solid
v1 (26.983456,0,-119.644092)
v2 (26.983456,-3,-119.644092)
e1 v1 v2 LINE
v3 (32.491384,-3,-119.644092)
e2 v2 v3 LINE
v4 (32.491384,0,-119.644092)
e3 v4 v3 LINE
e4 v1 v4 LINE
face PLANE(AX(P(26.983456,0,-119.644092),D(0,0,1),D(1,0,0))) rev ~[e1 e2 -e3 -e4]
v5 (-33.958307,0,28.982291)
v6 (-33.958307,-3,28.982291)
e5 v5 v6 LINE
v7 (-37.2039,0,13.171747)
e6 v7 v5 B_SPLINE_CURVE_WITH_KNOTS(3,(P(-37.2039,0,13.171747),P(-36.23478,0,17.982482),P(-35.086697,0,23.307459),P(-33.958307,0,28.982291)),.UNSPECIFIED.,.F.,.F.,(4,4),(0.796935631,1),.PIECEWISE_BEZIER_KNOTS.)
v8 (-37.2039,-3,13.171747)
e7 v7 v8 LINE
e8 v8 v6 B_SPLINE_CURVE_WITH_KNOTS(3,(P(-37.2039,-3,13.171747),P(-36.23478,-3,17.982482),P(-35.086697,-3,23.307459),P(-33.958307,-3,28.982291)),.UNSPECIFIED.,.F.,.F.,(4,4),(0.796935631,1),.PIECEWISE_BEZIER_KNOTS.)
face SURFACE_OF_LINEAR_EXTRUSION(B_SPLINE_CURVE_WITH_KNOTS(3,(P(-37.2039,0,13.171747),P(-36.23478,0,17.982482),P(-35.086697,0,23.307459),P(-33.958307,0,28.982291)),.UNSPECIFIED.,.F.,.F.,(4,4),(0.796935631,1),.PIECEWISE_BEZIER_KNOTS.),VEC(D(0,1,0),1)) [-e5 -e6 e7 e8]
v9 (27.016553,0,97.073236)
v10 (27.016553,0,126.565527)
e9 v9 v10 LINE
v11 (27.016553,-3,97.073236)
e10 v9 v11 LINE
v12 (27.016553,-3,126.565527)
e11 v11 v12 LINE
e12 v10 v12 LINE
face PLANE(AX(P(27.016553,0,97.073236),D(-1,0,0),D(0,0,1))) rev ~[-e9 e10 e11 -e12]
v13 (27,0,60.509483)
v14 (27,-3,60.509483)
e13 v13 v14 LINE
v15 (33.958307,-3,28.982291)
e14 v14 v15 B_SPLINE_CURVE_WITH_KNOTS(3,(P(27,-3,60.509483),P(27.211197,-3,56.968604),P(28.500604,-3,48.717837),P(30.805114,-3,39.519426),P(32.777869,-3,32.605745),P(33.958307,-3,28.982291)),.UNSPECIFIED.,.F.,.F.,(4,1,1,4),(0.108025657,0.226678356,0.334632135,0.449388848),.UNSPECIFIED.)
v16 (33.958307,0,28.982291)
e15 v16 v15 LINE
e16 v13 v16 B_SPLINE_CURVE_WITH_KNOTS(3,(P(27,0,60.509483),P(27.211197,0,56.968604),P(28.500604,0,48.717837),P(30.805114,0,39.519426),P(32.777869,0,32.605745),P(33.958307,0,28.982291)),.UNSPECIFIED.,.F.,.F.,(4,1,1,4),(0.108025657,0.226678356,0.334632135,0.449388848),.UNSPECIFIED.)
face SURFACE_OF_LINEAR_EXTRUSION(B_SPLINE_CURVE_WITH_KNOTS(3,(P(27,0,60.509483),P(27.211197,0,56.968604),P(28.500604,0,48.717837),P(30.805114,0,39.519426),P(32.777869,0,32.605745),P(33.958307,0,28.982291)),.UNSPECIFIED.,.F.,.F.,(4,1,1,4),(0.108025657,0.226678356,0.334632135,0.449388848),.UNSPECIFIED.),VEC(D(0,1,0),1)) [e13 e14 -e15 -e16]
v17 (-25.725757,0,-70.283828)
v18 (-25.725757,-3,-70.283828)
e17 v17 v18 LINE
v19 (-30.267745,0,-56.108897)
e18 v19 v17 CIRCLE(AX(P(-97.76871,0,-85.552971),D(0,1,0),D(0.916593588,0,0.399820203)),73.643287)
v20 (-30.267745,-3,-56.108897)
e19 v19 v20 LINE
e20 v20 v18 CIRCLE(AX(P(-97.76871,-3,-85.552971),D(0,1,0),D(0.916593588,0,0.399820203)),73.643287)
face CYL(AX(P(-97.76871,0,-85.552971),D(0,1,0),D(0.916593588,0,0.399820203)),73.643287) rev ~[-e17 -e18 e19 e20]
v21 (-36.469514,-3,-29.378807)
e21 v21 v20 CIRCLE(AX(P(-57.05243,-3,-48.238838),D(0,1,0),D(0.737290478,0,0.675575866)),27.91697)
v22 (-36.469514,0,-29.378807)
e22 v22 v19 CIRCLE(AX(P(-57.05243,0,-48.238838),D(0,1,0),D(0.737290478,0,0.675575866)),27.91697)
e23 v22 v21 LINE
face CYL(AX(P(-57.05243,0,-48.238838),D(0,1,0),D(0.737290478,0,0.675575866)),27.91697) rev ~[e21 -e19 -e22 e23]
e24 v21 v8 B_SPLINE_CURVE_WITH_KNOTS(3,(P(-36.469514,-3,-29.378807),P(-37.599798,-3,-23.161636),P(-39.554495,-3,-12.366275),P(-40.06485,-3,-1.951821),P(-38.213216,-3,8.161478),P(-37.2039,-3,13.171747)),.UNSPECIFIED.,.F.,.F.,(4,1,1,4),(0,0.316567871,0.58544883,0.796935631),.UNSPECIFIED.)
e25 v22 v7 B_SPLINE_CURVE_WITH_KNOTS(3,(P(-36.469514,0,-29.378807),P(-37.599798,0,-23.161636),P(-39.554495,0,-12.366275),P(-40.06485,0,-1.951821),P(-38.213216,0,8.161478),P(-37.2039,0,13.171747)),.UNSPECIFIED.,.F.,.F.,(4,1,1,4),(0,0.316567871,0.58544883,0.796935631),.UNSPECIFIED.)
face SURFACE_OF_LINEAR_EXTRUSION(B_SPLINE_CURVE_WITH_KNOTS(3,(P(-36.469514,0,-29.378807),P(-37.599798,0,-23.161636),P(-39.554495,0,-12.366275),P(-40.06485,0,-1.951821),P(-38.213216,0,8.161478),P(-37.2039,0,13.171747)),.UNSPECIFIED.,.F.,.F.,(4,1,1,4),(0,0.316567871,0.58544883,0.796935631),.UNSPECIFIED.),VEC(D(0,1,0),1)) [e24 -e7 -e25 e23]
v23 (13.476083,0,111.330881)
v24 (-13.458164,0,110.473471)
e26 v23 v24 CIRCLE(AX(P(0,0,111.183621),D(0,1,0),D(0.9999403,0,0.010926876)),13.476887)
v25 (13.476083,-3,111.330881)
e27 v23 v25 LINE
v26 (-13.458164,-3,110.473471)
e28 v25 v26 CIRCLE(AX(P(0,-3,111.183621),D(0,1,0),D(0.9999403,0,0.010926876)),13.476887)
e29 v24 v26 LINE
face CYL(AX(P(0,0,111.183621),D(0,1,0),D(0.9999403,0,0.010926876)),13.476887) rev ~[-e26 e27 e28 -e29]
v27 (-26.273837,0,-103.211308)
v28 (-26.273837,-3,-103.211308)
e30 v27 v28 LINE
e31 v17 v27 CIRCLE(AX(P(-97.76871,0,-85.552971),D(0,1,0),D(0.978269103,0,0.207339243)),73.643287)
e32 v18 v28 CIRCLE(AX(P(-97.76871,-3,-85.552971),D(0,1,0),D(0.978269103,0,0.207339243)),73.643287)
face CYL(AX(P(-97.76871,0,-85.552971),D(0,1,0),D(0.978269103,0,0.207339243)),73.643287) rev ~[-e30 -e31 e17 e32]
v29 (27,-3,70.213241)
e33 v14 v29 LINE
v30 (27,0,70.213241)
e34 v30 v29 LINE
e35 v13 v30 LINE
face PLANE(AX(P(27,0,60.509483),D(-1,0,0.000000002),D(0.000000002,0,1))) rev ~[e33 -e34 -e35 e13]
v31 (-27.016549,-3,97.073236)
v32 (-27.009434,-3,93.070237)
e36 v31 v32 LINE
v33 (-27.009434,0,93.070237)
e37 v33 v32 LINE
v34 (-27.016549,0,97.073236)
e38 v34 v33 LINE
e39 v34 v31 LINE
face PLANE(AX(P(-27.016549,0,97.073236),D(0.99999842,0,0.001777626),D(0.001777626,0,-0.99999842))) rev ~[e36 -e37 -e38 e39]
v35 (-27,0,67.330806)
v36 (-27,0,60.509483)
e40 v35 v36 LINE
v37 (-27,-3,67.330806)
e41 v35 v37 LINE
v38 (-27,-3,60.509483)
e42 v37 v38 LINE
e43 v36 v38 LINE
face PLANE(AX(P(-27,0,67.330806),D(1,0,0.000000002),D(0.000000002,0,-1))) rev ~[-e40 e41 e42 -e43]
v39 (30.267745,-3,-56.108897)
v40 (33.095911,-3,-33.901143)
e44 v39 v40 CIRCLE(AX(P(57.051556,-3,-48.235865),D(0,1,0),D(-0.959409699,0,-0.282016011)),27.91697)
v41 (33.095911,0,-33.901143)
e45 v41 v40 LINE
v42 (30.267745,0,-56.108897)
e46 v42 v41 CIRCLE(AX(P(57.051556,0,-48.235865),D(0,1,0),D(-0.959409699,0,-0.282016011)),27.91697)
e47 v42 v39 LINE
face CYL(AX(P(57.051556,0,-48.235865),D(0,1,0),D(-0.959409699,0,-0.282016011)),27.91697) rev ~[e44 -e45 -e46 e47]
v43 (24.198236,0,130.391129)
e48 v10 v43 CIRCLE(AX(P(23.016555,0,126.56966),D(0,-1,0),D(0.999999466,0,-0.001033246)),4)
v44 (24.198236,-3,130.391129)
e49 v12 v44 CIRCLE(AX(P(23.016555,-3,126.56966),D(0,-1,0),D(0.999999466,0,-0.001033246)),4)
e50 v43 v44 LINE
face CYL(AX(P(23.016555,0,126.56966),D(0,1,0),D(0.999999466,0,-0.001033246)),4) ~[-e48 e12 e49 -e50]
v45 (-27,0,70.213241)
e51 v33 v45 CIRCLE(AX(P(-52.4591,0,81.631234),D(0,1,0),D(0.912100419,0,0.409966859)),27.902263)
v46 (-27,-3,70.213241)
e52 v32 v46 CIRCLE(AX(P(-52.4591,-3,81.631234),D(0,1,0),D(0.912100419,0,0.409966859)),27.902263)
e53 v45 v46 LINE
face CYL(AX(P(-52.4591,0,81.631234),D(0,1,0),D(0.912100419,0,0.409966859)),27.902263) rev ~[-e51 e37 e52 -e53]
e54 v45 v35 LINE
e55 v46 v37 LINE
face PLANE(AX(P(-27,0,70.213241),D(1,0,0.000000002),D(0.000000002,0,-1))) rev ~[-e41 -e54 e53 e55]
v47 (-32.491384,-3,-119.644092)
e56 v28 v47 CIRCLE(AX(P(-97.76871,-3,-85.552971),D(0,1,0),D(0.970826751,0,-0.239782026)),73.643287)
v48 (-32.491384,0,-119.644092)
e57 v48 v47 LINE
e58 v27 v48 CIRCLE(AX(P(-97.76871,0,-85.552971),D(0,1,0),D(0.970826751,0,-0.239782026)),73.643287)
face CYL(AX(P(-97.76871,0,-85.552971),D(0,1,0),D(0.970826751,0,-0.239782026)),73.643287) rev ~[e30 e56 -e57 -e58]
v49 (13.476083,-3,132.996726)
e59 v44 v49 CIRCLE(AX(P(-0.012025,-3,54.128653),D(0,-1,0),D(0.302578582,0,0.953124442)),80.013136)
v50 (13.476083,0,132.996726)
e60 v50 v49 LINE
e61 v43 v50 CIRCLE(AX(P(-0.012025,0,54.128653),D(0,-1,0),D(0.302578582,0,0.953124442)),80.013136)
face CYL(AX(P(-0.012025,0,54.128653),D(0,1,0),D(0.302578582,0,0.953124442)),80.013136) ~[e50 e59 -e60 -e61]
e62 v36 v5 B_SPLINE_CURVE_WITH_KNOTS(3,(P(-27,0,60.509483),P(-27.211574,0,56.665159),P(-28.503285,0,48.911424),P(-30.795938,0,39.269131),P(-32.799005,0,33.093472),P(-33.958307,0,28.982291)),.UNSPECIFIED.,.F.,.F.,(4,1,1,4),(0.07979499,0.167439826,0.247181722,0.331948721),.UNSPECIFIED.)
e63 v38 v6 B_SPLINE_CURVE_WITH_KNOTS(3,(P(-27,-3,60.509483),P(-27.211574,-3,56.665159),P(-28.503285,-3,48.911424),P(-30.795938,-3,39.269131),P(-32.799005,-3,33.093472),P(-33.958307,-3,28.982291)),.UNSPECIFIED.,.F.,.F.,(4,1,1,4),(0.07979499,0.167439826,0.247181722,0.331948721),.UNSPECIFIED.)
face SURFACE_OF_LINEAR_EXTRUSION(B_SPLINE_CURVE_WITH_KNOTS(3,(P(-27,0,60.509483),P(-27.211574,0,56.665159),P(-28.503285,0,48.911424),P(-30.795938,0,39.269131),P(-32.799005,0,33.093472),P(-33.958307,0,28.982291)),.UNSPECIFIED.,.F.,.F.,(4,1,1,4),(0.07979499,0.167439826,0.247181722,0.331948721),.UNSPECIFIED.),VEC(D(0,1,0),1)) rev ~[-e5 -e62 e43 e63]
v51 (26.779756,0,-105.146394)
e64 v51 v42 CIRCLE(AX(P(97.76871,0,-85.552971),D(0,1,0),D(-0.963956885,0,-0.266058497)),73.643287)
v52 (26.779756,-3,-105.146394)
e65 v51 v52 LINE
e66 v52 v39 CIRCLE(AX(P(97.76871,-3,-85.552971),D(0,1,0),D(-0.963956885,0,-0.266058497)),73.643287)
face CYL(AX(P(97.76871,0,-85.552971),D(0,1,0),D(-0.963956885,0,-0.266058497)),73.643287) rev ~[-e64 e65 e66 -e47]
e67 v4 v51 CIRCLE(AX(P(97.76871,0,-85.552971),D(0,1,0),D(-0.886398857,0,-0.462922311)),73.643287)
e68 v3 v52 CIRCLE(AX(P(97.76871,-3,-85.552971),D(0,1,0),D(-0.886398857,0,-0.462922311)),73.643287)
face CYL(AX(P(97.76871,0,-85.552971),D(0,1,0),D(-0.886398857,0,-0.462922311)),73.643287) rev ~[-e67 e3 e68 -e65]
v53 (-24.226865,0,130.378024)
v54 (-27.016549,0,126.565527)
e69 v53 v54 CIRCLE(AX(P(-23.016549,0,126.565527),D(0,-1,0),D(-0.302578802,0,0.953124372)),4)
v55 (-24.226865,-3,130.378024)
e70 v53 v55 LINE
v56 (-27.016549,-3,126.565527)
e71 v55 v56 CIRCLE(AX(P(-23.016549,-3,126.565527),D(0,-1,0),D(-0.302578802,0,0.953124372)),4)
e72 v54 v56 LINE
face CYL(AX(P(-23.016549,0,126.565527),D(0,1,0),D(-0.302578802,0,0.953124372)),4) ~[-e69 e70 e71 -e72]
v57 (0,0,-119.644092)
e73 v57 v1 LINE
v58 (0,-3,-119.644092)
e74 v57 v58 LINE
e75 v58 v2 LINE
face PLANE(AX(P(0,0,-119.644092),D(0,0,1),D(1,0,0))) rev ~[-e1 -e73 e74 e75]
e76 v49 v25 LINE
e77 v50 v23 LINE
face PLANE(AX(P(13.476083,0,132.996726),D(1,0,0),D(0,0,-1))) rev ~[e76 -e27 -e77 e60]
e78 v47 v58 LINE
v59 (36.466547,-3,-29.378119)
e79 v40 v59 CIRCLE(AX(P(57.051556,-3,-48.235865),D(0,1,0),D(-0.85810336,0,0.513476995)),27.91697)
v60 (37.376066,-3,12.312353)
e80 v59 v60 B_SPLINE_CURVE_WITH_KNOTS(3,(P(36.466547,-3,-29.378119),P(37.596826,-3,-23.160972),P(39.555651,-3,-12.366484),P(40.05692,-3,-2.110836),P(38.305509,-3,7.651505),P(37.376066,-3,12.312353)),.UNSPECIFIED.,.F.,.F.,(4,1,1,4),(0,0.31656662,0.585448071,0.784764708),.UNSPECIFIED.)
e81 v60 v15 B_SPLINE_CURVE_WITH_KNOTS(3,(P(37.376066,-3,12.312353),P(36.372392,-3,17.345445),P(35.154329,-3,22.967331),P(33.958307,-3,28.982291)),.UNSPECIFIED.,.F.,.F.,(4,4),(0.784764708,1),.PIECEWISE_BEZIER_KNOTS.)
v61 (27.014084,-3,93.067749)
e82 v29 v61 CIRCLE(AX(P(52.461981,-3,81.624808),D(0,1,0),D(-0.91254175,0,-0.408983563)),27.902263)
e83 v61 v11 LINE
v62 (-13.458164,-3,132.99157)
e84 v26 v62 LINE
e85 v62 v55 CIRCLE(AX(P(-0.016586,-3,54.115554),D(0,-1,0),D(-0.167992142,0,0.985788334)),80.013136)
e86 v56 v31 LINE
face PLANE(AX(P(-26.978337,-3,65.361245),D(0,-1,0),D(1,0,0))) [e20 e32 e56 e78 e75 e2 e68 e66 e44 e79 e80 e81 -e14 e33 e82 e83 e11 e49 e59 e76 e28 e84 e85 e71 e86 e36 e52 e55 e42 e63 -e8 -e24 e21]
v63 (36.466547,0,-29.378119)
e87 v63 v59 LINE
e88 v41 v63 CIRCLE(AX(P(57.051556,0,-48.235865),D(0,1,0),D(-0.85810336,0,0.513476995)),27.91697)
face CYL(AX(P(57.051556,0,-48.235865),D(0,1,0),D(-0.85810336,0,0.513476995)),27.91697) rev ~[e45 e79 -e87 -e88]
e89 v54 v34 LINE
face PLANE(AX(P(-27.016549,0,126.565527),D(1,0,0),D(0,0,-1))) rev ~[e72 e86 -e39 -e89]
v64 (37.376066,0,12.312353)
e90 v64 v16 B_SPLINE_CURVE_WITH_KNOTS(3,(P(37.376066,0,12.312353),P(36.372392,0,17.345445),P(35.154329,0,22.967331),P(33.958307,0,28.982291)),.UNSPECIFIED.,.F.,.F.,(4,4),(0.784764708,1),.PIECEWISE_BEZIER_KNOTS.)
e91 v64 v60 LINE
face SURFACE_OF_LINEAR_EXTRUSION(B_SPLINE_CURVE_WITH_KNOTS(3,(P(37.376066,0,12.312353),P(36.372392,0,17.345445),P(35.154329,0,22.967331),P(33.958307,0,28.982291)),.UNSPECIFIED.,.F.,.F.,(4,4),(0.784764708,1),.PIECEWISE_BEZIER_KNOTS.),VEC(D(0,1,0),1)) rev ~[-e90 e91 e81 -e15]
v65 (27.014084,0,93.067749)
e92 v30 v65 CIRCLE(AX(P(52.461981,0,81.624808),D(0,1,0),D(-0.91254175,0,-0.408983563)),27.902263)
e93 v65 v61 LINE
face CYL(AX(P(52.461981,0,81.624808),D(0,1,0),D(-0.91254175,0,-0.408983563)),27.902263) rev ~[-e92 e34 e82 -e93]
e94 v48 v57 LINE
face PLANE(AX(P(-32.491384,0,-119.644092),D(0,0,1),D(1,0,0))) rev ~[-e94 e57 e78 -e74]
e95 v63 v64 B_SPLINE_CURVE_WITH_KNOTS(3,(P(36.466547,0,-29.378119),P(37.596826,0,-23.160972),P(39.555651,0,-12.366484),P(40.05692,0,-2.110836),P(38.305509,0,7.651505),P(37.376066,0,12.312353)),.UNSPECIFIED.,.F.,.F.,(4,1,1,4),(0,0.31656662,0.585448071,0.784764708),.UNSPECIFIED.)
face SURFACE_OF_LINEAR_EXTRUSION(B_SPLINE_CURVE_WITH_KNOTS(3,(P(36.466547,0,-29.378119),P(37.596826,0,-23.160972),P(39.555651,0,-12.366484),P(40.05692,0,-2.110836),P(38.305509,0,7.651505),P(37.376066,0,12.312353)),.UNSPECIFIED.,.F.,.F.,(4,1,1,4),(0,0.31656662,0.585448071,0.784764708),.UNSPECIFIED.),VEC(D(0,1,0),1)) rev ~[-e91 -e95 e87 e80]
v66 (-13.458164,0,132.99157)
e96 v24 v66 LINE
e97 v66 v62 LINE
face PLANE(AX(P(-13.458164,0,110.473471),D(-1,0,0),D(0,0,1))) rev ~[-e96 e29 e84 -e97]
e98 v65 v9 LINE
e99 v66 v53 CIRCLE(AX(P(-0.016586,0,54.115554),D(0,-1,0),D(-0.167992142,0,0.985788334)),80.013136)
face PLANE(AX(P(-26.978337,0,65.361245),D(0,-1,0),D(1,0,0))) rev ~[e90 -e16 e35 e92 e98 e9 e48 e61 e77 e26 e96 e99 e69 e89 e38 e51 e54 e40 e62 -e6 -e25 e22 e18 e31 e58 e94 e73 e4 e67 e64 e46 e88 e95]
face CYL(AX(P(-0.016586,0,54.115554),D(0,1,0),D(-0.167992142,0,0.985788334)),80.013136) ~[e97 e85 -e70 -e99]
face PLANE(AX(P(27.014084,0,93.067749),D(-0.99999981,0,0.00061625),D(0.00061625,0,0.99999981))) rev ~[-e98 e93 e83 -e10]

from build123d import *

# Parameters (mm, degrees)
F1_DEPTH = 3


with BuildPart() as f1:
    # F0 (on Front) → F1 (new body)
    with BuildSketch(Plane.XZ):
        with BuildLine():
            Line((-27.000000372, 67.3308055204), (-27.0000003572, 60.5094830675))
            add(Edge.make_bspline(
                [(-27.0000003783, 70.2132413448), (-27.000000372, 67.3308055204), (-26.8073760372, 64.0094927256), (-27.0000003572, 60.5094830675)],
                knots=[0, 0, 0, 0, 0.0797949898, 0.0797949898, 0.0797949898, 0.0797949898], degree=3))
            Line((-27.0000003783, 70.2132413448), (-27.000000372, 67.3308055204))
        make_face()
        with BuildLine():
            add(Edge.make_bspline(
                [(-27.0000003783, 70.2132413448), (-27.000000372, 67.3308055204), (-26.8073760372, 64.0094927256), (-27.0000003572, 60.5094830675)],
                knots=[0, 0, 0, 0, 0.0797949898, 0.0797949898, 0.0797949898, 0.0797949898], degree=3))
            add(Edge.make_bspline(
                [(-27.0000003572, 60.5094830675), (-27.2115741289, 56.665159338), (-28.5032848349, 48.9114242757), (-30.7959376047, 39.269131214), (-32.7990054786, 33.0934715655), (-33.9583066177, 28.9822912379)],
                knots=[0.0797949898, 0.0797949898, 0.0797949898, 0.0797949898, 0.1674398258, 0.2471817217, 0.3319487208, 0.3319487208, 0.3319487208, 0.3319487208], degree=3))
            add(Edge.make_bspline(
                [(-37.2038997366, 13.1717467116), (-36.2347795039, 17.9824819127), (-35.0866971891, 23.3074594843), (-33.9583066177, 28.9822912379)],
                knots=[0.7969356306, 0.7969356306, 0.7969356306, 0.7969356306, 1, 1, 1, 1], degree=3))
            add(Edge.make_bspline(
                [(-37.2038997366, 13.1717467116), (-37.3377860295, 11.7966552771), (-37.8318020205, 3.6131566189), (-34.8319401075, -9.4971781129), (-33.3481357614, -22.2384102756), (-27.0171200398, -42.5814503212), (-25.8644027957, -62.9931088525), (-25.7257572716, -70.2838279012)],
                knots=[0.4247645948, 0.4247645948, 0.4247645948, 0.4247645948, 0.4471809961, 0.5577287405, 0.6473745734, 0.7857235681, 0.8551599855, 0.8551599855, 0.8551599855, 0.8551599855], degree=3))
            ThreePointArc((-25.7257572716, -70.2838279012), (-24.1356221819, -86.7785971976), (-26.2738365605, -103.2113079605))
            add(Edge.make_bspline(
                [(-26.2738365605, -103.2113079605), (-26.4866600906, -108.6415730769), (-26.7346990947, -114.1409528022), (-26.9831408055, -119.6440920773)],
                knots=[0.952812329, 0.952812329, 0.952812329, 0.952812329, 0.9989562439, 0.9989562439, 0.9989562439, 0.9989562439], degree=3))
            Line((-26.9831408055, -119.6440920773), (0, -119.6440920773))
            Line((-6.3e-09, -119.6440920772), (26.9834561434, -119.6440920746))
            add(Edge.make_bspline(
                [(26.7797560592, -105.146393671), (26.7183865925, -110.0484100554), (26.7770637598, -114.8950679943), (26.9834561434, -119.6440920746)],
                knots=[0.9591803486, 0.9591803486, 0.9591803486, 0.9591803486, 0.9989568231, 0.9989568231, 0.9989568231, 0.9989568231], degree=3))
            ThreePointArc((26.7797560592, -105.146393671), (24.3110117736, -80.3279975292), (30.2677449554, -56.1088973147))
            ThreePointArc((30.2677449554, -56.1088973147), (29.3582502263, -44.7091117977), (33.0959109358, -33.901143306))
            add(Edge.make_bspline(
                [(37.3760657429, 12.312352727), (37.4207370145, 11.2848759506), (37.6386418394, 0.6550807977), (35.3777267818, -16.2805465578), (33.0959109358, -33.901143306)],
                knots=[0.5873705512, 0.5873705512, 0.5873705512, 0.5873705512, 0.6053891461, 0.7637611434, 0.7637611434, 0.7637611434, 0.7637611434], degree=3))
            add(Edge.make_bspline(
                [(37.3760657429, 12.312352727), (36.3723917785, 17.3454447873), (35.1543287191, 22.9673311954), (33.9583066177, 28.9822912379)],
                knots=[0.7847647083, 0.7847647083, 0.7847647083, 0.7847647083, 1, 1, 1, 1], degree=3))
            add(Edge.make_bspline(
                [(27.0000003572, 60.5094830675), (27.211196853, 56.9686043212), (28.5006041901, 48.7178368751), (30.8051136621, 39.5194264195), (32.7778690192, 32.6057451698), (33.9583066177, 28.9822912379)],
                knots=[0.1080256566, 0.1080256566, 0.1080256566, 0.1080256566, 0.2266783563, 0.3346321349, 0.449388848, 0.449388848, 0.449388848, 0.449388848], degree=3))
            add(Edge.make_bspline(
                [(27.0000003783, 70.2132413448), (27.0000003698, 66.3110286441), (26.8077195227, 63.7332255726), (27.0000003572, 60.5094830675)],
                knots=[0, 0, 0, 0, 0.1080256566, 0.1080256566, 0.1080256566, 0.1080256566], degree=3))
            ThreePointArc((27.0000003783, 70.2132413448), (24.5597225455, 81.642003215), (27.0140844765, 93.0677487616))
            Line((27.0140844765, 93.0677487616), (27.0165528594, 97.073236044))
            Line((27.0165528594, 97.073236044), (27.0165528594, 126.5655265976))
            ThreePointArc((27.0165528594, 126.5655265976), (26.2369988642, 128.9421564287), (24.1982364647, 130.3911290521))
            ThreePointArc((24.1982364647, 130.3911290521), (18.8821286754, 131.8789775648), (13.4760826795, 132.9967261563))
            Line((13.4760826795, 132.9967261563), (13.4760826795, 111.3308812648))
            ThreePointArc((13.4760826795, 111.3308812648), (0.4287985626, 97.7135570783), (-13.4581639711, 110.4734713575))
            ThreePointArc((-13.4581639711, 110.4734713575), (-13.4768872509, 111.1836209893), (-13.4581639711, 111.8937706212))
            Line((-13.4581639711, 111.8937706212), (-13.4581639711, 132.9915701483))
            ThreePointArc((-13.4581639711, 132.9915701483), (-18.8878136613, 131.8714457801), (-24.2268647008, 130.3780240861))
            ThreePointArc((-24.2268647008, 130.3780240861), (-26.2446496183, 128.9275955182), (-27.0165494938, 126.5655265976))
            Line((-27.0165494938, 126.5655265976), (-27.0165494938, 97.073236044))
            Line((-27.0165494938, 97.073236044), (-27.0094336483, 93.0702374443))
            ThreePointArc((-27.0094336483, 93.0702374443), (-24.5568387649, 81.642749654), (-27.0000003783, 70.2132413448))
        make_face()
        with BuildLine():
            add(Edge.make_bspline(
                [(-37.2038997366, 13.1717467116), (-37.3377860295, 11.7966552771), (-37.8318020205, 3.6131566189), (-34.8319401075, -9.4971781129), (-33.3481357614, -22.2384102756), (-27.0171200398, -42.5814503212), (-25.8644027957, -62.9931088525), (-25.7257572716, -70.2838279012)],
                knots=[0.4247645948, 0.4247645948, 0.4247645948, 0.4247645948, 0.4471809961, 0.5577287405, 0.6473745734, 0.7857235681, 0.8551599855, 0.8551599855, 0.8551599855, 0.8551599855], degree=3))
            add(Edge.make_bspline(
                [(-36.4695142582, -29.3788072578), (-37.5997978701, -23.1616359537), (-39.5544950983, -12.3662754957), (-40.0648496415, -1.9518214908), (-38.2132158377, 8.1614782915), (-37.2038997366, 13.1717467116)],
                knots=[0, 0, 0, 0, 0.3165678715, 0.5854488298, 0.7969356306, 0.7969356306, 0.7969356306, 0.7969356306], degree=3))
            ThreePointArc((-36.4695142582, -29.3788072578), (-29.8578197059, -41.9292933744), (-30.2677449554, -56.1088973147))
            ThreePointArc((-30.2677449554, -56.1088973147), (-27.6377010863, -63.081314369), (-25.7257572716, -70.2838279012))
        make_face()
        with BuildLine():
            add(Edge.make_bspline(
                [(-26.2738365605, -103.2113079605), (-26.4866600906, -108.6415730769), (-26.7346990947, -114.1409528022), (-26.9831408055, -119.6440920773)],
                knots=[0.952812329, 0.952812329, 0.952812329, 0.952812329, 0.9989562439, 0.9989562439, 0.9989562439, 0.9989562439], degree=3))
            ThreePointArc((-26.2738365605, -103.2113079605), (-28.8907910345, -111.6137859631), (-32.4913841825, -119.6440920773))
            Line((-32.4913841825, -119.6440920773), (-26.9831408055, -119.6440920773))
        make_face()
        with BuildLine():
            Line((-13.4581639711, 110.4734713575), (-13.4581639711, 111.8937706212))
            ThreePointArc((-13.4581639711, 111.8937706212), (-13.4768872509, 111.1836209893), (-13.4581639711, 110.4734713575))
        make_face()
        with BuildLine():
            add(Edge.make_bspline(
                [(26.7797560592, -105.146393671), (26.7183865925, -110.0484100554), (26.7770637598, -114.8950679943), (26.9834561434, -119.6440920746)],
                knots=[0.9591803486, 0.9591803486, 0.9591803486, 0.9591803486, 0.9989568231, 0.9989568231, 0.9989568231, 0.9989568231], degree=3))
            Line((26.9834561434, -119.6440920746), (32.4913842119, -119.644092074))
            ThreePointArc((32.4913841825, -119.6440920773), (29.2510439227, -112.5467338616), (26.7797560592, -105.146393671))
        make_face()
        with BuildLine():
            add(Edge.make_bspline(
                [(37.3760657429, 12.312352727), (37.4207370145, 11.2848759506), (37.6386418394, 0.6550807977), (35.3777267818, -16.2805465578), (33.0959109358, -33.901143306)],
                knots=[0.5873705512, 0.5873705512, 0.5873705512, 0.5873705512, 0.6053891461, 0.7637611434, 0.7637611434, 0.7637611434, 0.7637611434], degree=3))
            ThreePointArc((33.0959109358, -33.901143306), (34.6666972167, -31.5542800935), (36.4665470243, -29.37811899))
            add(Edge.make_bspline(
                [(36.4665470243, -29.37811899), (37.596826169, -23.1609722577), (39.5556506505, -12.3664838808), (40.0569196281, -2.1108359245), (38.3055086703, 7.651504698), (37.3760657429, 12.312352727)],
                knots=[0, 0, 0, 0, 0.3165666204, 0.5854480709, 0.7847647083, 0.7847647083, 0.7847647083, 0.7847647083], degree=3))
        make_face()
        with BuildLine():
            add(Edge.make_bspline(
                [(27.0000003783, 70.2132413448), (27.0000003698, 66.3110286441), (26.8077195227, 63.7332255726), (27.0000003572, 60.5094830675)],
                knots=[0, 0, 0, 0, 0.1080256566, 0.1080256566, 0.1080256566, 0.1080256566], degree=3))
            Line((27.0000003572, 60.5094830675), (27.0000003783, 70.2132413448))
        make_face()
    extrude(amount=F1_DEPTH)


solid = f1.part
